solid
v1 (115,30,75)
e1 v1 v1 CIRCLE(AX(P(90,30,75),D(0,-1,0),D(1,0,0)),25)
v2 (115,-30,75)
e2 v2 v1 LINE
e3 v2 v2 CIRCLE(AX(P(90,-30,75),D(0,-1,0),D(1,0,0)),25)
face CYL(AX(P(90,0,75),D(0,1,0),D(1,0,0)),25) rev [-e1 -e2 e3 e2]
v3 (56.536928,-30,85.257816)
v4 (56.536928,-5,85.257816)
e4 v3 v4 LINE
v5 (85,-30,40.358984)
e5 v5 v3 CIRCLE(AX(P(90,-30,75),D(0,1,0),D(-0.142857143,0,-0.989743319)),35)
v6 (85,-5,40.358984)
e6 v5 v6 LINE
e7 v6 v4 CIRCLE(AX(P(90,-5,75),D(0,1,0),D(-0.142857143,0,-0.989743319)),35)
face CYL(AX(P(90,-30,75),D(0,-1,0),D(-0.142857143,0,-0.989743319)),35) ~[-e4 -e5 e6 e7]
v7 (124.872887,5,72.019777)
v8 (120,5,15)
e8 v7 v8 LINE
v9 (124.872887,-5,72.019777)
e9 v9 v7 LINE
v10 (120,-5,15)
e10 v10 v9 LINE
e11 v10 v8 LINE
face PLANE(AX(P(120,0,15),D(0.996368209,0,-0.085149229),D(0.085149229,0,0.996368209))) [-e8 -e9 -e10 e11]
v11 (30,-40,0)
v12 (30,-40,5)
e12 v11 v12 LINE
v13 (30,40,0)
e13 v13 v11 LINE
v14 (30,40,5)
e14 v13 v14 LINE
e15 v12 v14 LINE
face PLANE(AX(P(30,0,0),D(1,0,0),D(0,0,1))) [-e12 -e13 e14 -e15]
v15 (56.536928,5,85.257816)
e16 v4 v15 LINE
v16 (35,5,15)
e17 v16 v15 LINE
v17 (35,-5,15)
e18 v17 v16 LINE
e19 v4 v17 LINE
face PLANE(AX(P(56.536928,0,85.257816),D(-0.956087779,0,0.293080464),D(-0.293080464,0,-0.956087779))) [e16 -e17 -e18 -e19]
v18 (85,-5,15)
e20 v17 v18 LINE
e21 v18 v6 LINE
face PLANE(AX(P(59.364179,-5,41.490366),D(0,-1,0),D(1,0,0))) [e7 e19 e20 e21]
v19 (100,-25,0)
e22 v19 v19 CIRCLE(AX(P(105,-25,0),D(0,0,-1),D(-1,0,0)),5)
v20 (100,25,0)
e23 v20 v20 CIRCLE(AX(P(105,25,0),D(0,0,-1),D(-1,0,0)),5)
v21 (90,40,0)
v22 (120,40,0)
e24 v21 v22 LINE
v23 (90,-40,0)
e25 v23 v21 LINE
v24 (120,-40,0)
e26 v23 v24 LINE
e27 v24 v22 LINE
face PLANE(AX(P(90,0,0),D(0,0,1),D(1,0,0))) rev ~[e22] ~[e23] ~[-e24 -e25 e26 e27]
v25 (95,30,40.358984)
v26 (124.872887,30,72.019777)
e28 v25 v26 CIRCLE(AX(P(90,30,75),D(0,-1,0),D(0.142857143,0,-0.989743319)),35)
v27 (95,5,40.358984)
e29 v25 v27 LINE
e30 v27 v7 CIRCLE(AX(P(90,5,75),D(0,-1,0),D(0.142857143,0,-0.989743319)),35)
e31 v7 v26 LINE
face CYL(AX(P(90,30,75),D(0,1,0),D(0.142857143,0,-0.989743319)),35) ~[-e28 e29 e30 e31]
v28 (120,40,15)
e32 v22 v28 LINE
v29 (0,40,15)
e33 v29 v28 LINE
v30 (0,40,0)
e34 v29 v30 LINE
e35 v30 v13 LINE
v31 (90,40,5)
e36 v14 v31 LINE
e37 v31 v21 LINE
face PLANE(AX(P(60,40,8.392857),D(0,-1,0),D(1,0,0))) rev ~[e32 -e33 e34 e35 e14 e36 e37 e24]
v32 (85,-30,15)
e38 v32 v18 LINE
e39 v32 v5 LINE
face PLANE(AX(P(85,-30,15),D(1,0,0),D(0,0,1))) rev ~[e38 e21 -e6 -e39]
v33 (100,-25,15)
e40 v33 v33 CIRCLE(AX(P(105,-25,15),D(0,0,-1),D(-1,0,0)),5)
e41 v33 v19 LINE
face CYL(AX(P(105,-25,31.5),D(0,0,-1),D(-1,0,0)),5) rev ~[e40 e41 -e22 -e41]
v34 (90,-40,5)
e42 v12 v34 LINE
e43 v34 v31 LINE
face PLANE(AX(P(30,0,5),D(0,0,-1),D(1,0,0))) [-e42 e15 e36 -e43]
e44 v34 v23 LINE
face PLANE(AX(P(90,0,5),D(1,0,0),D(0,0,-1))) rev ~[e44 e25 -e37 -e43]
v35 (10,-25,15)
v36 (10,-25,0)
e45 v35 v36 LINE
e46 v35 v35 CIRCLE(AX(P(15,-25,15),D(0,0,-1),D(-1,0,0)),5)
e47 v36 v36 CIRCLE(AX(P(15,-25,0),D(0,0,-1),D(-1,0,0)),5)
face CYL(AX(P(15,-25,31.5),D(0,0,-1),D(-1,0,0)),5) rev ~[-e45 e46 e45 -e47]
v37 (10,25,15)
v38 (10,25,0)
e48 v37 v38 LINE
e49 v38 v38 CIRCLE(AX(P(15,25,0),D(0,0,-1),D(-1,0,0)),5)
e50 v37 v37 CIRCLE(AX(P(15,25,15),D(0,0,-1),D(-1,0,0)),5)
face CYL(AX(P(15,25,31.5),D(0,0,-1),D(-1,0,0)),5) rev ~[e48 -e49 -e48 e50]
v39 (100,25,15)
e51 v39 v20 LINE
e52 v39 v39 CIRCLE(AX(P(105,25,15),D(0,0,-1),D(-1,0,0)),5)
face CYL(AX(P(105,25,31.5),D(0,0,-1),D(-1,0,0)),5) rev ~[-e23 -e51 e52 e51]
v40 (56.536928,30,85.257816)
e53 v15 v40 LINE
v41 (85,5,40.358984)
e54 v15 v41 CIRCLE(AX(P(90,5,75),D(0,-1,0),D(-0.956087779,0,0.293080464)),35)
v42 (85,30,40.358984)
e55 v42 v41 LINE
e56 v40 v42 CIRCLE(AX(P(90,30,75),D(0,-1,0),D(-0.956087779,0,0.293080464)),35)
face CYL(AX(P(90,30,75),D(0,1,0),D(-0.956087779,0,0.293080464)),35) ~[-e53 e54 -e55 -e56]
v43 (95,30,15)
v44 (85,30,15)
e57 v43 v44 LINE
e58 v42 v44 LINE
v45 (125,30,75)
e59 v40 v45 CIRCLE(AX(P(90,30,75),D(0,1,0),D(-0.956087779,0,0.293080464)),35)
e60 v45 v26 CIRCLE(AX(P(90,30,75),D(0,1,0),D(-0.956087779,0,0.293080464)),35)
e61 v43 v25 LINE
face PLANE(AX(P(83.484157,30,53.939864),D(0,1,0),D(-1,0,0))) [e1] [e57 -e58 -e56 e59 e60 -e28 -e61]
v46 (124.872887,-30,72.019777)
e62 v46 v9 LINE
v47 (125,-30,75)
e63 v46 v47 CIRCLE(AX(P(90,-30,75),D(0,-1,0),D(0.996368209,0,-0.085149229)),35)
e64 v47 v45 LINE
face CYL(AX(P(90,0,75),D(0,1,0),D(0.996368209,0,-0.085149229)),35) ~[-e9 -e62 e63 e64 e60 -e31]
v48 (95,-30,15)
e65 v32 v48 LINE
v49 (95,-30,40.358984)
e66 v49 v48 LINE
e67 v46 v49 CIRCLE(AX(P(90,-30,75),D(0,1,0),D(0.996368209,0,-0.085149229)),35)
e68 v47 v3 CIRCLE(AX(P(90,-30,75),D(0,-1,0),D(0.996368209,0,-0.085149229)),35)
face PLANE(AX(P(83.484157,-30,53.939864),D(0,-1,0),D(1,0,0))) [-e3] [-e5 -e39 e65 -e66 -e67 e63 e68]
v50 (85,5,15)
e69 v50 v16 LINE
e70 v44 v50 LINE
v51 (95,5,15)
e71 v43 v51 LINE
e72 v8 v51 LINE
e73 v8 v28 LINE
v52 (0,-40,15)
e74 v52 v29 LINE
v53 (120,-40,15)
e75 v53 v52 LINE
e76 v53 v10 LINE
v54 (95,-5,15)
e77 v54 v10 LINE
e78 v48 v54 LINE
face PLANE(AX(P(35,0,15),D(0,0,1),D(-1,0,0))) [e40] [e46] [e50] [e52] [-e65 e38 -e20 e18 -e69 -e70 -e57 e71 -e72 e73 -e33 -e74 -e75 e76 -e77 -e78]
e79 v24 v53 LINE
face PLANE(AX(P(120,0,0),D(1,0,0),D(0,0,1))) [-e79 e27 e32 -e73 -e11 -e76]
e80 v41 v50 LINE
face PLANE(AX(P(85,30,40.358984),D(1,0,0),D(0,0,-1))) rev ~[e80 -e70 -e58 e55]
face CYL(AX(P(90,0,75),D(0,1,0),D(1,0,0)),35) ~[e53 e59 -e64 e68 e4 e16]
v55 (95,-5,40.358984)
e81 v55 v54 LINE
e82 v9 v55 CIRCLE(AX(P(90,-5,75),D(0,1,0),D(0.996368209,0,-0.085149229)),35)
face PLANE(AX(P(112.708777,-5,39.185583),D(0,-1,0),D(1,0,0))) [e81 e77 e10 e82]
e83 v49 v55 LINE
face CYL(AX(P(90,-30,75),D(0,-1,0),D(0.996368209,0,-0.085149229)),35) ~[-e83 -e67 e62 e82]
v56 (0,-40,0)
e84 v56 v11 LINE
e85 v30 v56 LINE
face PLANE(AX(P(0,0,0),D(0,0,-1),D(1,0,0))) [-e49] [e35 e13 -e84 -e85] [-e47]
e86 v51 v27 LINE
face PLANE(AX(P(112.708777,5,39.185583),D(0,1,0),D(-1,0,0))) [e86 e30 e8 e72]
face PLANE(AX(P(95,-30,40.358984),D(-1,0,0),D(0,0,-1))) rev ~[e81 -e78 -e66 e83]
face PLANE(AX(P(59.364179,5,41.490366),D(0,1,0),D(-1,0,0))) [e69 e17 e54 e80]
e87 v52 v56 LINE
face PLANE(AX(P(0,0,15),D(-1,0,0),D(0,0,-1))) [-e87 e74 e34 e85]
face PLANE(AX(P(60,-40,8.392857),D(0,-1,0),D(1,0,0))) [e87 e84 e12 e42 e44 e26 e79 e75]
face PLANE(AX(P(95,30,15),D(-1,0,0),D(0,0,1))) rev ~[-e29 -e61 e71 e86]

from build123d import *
from build123d import SkipClean  # not in build123d's __all__

# Parameters (mm, degrees)
F0_R      = 25
F1_DEPTH  = 40
F2_R      = 25
F3_DEPTH  = 10
F4_R      = 25
F5_DEPTH  = 10
F7_DEPTH  = 25
F9_DEPTH  = 25
F11_D     = 10
F11_DEPTH = 16.5
F11_TIP   = 3.0043030951


with BuildPart() as f1:
    # F0 (on Front) → F1 (new body, symmetric)
    with BuildSketch(Plane.XZ):
        Polygon((0, 15), (0, 0), (30, 0), (30, 5), (90, 5), (90, 0), (120, 0), (120, 15), (35, 15), align=None)
        with BuildLine():
            Line((56.536927729, 85.2578162484), (35, 15))
            Line((35, 15), (120, 15))
            Line((120, 15), (124.8728873319, 72.0197769993))
            ThreePointArc((124.8728873319, 72.0197769993), (83.3435508402, 40.638805542), (56.536927729, 85.2578162484))
        make_face()
        with BuildLine():
            ThreePointArc((125, 75), (95.186158044, 109.613635532), (56.536927729, 85.2578162484))
            ThreePointArc((56.536927729, 85.2578162484), (83.3435508402, 40.638805542), (124.8728873319, 72.0197769993))
            ThreePointArc((124.8728873319, 72.0197769993), (124.9682073934, 73.5085337111), (125, 75))
        make_face()
        with Locations((90, 75)):
            Circle(F0_R, mode=Mode.SUBTRACT)
    extrude(amount=F1_DEPTH, both=True)

    # F2 (on face) → F3 (cut)
    with BuildSketch(Plane.XZ.offset(40)):
        with BuildLine():
            Line((56.536927729, 85.2578162484), (35, 15))
            Line((35, 15), (120, 15))
            Line((120, 15), (124.8728873319, 72.0197769993))
            ThreePointArc((124.8728873319, 72.0197769993), (96.6564491598, 109.361194458), (56.536927729, 85.2578162484))
        make_face()
        with Locations((90, 75)):
            Circle(F2_R, mode=Mode.SUBTRACT)
    extrude(amount=-F3_DEPTH, mode=Mode.SUBTRACT)

    # F4 (on face) → F5 (cut)
    with BuildSketch(Plane(origin=(0, 40, 0), x_dir=(-1, 0, 0), z_dir=(0, 1, 0))):
        with BuildLine():
            Line((-120, 15), (-35, 15))
            Line((-35, 15), (-56.536927729, 85.2578162484))
            ThreePointArc((-56.536927729, 85.2578162484), (-96.6564491598, 109.361194458), (-124.8728873319, 72.0197769993))
            Line((-124.8728873319, 72.0197769993), (-120, 15))
        make_face()
        with Locations((-90, 75)):
            Circle(F4_R, mode=Mode.SUBTRACT)
    extrude(amount=-F5_DEPTH, mode=Mode.SUBTRACT)

    # F6 (on face) → F7 (cut)
    with BuildSketch(Plane.XZ.offset(30)):
        with BuildLine():
            ThreePointArc((85, 40.3589838486), (60.439413574, 56.2604234265), (56.536927729, 85.2578162484))
            Line((56.536927729, 85.2578162484), (35, 15))
            Line((35, 15), (85, 15))
            Line((85, 15), (85, 40.3589838486))
        make_face()
        with BuildLine():
            Line((120, 15), (124.8728873319, 72.0197769993))
            ThreePointArc((124.8728873319, 72.0197769993), (115.4570862783, 50.980492132), (95, 40.3589838486))
            Line((95, 40.3589838486), (95, 15))
            Line((95, 15), (120, 15))
        make_face()
    with SkipClean():  # cleaning this boolean's faces spoils the solid; the shape is the same uncleaned
        extrude(amount=-F7_DEPTH, mode=Mode.SUBTRACT)

    # F8 (on face) → F9 (cut)
    with BuildSketch(Plane(origin=(0, 30, 0), x_dir=(-1, 0, 0), z_dir=(0, 1, 0))):
        with BuildLine():
            ThreePointArc((-95, 40.3589838486), (-115.4570862783, 50.980492132), (-124.8728873319, 72.0197769993))
            Line((-124.8728873319, 72.0197769993), (-120, 15))
            Line((-120, 15), (-95, 15))
            Line((-95, 15), (-95, 40.3589838486))
        make_face()
        with BuildLine():
            Line((-35, 15), (-56.536927729, 85.2578162484))
            ThreePointArc((-56.536927729, 85.2578162484), (-60.439413574, 56.2604234265), (-85, 40.3589838486))
            Line((-85, 40.3589838486), (-85, 15))
            Line((-85, 15), (-35, 15))
        make_face()
    extrude(amount=-F9_DEPTH, mode=Mode.SUBTRACT)

    # F11
    with Locations(Plane.XY.offset(15)):
        with Locations((15, 25), (15, -25), (105, -25), (105, 25)):
            Hole(F11_D / 2, depth=F11_DEPTH)
            with Locations((0, 0, -(F11_DEPTH + F11_TIP / 2))):  # 118° drill point
                Cone(0, F11_D / 2, F11_TIP, mode=Mode.SUBTRACT)


solid = f1.part
